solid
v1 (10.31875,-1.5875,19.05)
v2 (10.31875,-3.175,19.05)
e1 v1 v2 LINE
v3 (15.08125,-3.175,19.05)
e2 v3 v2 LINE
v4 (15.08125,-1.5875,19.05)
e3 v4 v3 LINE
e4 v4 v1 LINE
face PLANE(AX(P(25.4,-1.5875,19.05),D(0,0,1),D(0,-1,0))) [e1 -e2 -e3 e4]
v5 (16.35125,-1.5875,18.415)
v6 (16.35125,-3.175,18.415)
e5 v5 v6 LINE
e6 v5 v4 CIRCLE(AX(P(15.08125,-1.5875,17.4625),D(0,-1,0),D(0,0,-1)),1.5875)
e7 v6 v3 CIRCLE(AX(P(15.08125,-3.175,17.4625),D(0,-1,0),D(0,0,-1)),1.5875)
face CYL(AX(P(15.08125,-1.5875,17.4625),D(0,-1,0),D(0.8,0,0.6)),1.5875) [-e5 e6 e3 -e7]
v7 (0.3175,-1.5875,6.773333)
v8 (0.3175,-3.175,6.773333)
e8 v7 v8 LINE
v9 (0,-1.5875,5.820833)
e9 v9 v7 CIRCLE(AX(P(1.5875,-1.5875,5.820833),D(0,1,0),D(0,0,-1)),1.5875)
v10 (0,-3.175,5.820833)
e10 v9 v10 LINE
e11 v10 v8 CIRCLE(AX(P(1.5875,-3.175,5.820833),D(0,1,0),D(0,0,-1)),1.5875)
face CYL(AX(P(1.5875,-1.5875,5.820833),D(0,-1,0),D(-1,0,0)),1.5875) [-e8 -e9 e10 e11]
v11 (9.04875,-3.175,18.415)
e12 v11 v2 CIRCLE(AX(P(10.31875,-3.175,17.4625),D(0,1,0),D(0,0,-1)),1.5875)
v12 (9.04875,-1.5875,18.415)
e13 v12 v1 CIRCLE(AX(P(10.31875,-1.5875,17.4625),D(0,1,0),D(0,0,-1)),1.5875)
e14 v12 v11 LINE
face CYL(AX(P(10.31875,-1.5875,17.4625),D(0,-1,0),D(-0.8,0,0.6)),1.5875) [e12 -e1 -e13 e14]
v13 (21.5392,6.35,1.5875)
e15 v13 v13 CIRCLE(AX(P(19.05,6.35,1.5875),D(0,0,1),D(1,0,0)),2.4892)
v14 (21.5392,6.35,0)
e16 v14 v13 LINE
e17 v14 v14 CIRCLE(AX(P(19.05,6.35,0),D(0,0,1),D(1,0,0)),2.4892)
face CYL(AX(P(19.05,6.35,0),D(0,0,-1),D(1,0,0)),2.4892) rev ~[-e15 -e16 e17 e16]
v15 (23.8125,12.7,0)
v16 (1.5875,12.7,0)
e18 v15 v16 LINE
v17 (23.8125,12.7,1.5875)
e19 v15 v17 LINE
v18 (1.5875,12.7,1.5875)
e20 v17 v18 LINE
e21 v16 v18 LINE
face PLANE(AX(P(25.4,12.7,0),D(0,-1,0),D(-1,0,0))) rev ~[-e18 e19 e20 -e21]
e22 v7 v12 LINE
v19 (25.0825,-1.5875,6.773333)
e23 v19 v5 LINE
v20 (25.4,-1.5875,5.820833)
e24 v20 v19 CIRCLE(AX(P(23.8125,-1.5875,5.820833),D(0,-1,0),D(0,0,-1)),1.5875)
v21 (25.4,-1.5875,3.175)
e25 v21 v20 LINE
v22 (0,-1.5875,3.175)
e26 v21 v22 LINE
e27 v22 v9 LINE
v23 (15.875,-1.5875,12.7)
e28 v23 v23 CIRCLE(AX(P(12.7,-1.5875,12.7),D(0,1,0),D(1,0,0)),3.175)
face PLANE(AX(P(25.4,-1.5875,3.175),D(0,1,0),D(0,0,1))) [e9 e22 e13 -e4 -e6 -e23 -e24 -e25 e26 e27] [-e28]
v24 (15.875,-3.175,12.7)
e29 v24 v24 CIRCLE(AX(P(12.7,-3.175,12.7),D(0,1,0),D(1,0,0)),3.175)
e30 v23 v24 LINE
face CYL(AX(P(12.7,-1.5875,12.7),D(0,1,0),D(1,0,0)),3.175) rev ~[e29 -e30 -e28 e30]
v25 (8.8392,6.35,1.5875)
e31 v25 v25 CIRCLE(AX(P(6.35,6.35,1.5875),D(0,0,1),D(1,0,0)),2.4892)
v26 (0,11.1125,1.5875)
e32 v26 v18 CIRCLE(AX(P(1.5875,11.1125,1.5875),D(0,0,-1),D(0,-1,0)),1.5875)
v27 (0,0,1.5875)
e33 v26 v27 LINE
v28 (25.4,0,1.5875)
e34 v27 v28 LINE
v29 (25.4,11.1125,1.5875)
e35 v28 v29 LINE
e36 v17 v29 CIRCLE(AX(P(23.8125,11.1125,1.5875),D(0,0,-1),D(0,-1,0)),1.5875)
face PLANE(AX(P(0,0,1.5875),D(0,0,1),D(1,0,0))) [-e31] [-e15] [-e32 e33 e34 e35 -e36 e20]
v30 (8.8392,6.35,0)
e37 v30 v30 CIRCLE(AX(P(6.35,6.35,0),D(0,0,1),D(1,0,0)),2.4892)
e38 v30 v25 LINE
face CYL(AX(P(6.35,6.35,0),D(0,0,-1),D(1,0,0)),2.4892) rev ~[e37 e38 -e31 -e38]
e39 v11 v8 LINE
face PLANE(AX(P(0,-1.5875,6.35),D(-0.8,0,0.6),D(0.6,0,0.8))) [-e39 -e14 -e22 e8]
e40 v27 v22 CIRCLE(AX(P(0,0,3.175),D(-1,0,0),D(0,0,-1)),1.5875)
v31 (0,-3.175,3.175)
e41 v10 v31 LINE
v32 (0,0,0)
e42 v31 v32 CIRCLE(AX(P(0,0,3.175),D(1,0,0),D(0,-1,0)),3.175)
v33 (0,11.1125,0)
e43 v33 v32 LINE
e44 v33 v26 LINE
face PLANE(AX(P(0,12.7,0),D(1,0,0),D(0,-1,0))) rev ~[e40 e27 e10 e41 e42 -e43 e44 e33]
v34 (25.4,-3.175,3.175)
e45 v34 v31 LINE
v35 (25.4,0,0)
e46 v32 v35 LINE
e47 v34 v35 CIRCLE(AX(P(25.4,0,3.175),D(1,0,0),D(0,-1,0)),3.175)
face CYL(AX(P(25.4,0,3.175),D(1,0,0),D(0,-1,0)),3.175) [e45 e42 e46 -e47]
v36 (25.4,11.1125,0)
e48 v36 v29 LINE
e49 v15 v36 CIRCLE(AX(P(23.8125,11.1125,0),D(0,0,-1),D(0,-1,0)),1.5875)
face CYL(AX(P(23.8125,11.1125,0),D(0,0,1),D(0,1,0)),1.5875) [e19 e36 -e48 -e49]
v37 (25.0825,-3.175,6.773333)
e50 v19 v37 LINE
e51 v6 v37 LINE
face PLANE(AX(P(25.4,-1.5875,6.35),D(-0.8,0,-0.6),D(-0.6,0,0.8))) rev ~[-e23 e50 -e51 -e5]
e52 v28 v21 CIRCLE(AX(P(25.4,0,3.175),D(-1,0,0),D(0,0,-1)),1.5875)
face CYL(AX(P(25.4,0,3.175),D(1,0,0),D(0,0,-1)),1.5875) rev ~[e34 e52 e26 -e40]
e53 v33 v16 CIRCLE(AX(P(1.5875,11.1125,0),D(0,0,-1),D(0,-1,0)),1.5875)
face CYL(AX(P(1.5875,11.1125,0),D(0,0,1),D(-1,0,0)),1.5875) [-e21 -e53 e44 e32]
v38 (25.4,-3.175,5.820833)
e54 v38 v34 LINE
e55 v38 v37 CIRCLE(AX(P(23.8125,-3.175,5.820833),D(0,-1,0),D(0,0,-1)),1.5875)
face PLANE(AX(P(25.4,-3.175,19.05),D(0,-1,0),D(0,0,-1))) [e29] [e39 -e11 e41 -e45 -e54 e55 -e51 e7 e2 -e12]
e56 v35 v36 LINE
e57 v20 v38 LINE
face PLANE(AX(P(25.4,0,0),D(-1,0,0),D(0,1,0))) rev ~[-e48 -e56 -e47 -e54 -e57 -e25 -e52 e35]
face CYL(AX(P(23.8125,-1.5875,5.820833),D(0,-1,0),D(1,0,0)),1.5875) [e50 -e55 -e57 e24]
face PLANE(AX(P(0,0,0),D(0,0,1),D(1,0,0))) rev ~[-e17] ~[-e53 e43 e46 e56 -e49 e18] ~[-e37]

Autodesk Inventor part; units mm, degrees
ref_plane "YZ Plane" through (0, 0, 0) normal (1, 0, 0) x (0, 1, 0)
ref_plane "XZ Plane" through (0, 0, 0) normal (0, 1, 0) x (-1, 0, 0)
ref_plane "XY Plane" through (0, 0, 0) normal (0, 0, 1) x (1, 0, 0)
sketch "Sketch1" plane through (0, 0, 0) normal (0, 0, 1) x (1, 0, 0)
  line L0 (0, 0) -> (25.4, 0)
  line L1 (25.4, 0) -> (25.4, 12.7)
  line L2 (25.4, 12.7) -> (0, 12.7)
  line L3 (0, 12.7) -> (0, 0)
  circle A0 centre (6.35, 6.35) radius 2.4892
  circle A1 centre (19.05, 6.35) radius 2.4892
  line L4 (12.7, 12.7) -> (12.7, 0) construction
  dimension "d0" = 25.4
  dimension "d1" = 12.7
  dimension "d2" = 4.9784
  dimension "d3" = 4.9784
  dimension "d4" = 6.35
  dimension "d5" = 6.35
  dimension "d6" = 6.35
  dimension "d7" = 6.35
extrude "Plate1" add sketch "Sketch1" along normal blind 1.5875
sketch "Sketch2" plane through (25.4, -1.5875, 3.175) normal (0, -1, 0) x (1, 0, 0)
  line L0 (-25.4, 0) -> (0, 0)
  line L1 (0, 0) -> (0, 15.875)
  line L2 (0, 15.875) -> (-25.4, 15.875)
  line L3 (-25.4, 15.875) -> (-25.4, 0)
edge flange "Flange1" height 19.05 angle 90 thickness 1.5875 bend radius 1.5875 thickness toward (0, -1, 0) relief tear relief width 1.5875 relief depth 0.7937 edges at (12.7, 0, 1.5875) wall of the first edge with corners at (0, -1.5875, 3.175) (25.4, -1.5875, 3.175) (25.4, -1.5875, 19.05) (0, -1.5875, 19.05)
bend "Bend1"
corner "Corner1"
sketch "Sketch3" plane through (0, -1.5875, 19.05) normal (0, 1, 0) x (1, 0, 0)
  line L0 (25.4, 15.875) -> (0, 15.875) projected
  line L1 (0, 0) -> (0, 15.875) projected
  line L2 (0, 0) -> (25.4, 0) projected
  line L3 (25.4, 0) -> (25.4, 15.875) projected
  line L4 (0, 12.7) -> (9.525, 0)
  line L5 (12.7, 0) -> (12.7, 15.875) construction
  line L6 (25.4, 12.7) -> (15.875, 0)
  circle A0 centre (12.7, 6.35) radius 3.175
  line L7 (9.525, 0) -> (15.875, 0)
  line L8 (25.4, 12.7) -> (25.4, 15.875)
  point P0 (0, 19.05)
  dimension "d19" = 3.175
  dimension "d20" = 3.175
  dimension "d21" = 6.35
  dimension "d22" = 6.35
extrude "Extrusion1" cut sketch "Sketch3" against normal blind 25.4 contours L3 L2 L6 | L4 L2 L1 | A0
fillet "Fillet1" radius 1.5875 6 edges at (9.525, -2.3812, 19.05) (0, -2.3813, 6.35) (25.4, -2.3813, 6.35) (15.875, -2.3812, 19.05) (25.4, 12.7, 0.7937) (0, 12.7, 0.7937)
equation "\"d5\" = d4"
equation "\"d7\" = d6"
equation "\"d9\" = BendReliefWidth"
equation "\"d10\" = BendReliefDepth"
equation "\"d11\" = MinimumRemnant"
equation "\"d12\" = BendRadius"
equation "\"d15\" = BendRadius"
equation "\"d16\" = CornerReliefSize"
equation "\"d17\" = GapSize"
equation "\"d18\" = JacobiRadiusSize"
equation "\"BendRadius\" = Thickness"
equation "\"BendReliefWidth\" = Thickness"
equation "\"BendReliefDepth\" = 0.5 * Thickness"
equation "\"CornerReliefSize\" = 4 * Thickness"
equation "\"MinimumRemnant\" = 2 * Thickness"
equation "\"TransitionRadius\" = BendRadius"
equation "\"JacobiRadiusSize\" = BendRadius"
equation "\"GapSize\" = Thickness"
equation "\"d8\" = BendRadius"
equation "\"Thickness\" = 1.5875"
properties part number "Flange for Torsion Spring" material "Aluminum"
